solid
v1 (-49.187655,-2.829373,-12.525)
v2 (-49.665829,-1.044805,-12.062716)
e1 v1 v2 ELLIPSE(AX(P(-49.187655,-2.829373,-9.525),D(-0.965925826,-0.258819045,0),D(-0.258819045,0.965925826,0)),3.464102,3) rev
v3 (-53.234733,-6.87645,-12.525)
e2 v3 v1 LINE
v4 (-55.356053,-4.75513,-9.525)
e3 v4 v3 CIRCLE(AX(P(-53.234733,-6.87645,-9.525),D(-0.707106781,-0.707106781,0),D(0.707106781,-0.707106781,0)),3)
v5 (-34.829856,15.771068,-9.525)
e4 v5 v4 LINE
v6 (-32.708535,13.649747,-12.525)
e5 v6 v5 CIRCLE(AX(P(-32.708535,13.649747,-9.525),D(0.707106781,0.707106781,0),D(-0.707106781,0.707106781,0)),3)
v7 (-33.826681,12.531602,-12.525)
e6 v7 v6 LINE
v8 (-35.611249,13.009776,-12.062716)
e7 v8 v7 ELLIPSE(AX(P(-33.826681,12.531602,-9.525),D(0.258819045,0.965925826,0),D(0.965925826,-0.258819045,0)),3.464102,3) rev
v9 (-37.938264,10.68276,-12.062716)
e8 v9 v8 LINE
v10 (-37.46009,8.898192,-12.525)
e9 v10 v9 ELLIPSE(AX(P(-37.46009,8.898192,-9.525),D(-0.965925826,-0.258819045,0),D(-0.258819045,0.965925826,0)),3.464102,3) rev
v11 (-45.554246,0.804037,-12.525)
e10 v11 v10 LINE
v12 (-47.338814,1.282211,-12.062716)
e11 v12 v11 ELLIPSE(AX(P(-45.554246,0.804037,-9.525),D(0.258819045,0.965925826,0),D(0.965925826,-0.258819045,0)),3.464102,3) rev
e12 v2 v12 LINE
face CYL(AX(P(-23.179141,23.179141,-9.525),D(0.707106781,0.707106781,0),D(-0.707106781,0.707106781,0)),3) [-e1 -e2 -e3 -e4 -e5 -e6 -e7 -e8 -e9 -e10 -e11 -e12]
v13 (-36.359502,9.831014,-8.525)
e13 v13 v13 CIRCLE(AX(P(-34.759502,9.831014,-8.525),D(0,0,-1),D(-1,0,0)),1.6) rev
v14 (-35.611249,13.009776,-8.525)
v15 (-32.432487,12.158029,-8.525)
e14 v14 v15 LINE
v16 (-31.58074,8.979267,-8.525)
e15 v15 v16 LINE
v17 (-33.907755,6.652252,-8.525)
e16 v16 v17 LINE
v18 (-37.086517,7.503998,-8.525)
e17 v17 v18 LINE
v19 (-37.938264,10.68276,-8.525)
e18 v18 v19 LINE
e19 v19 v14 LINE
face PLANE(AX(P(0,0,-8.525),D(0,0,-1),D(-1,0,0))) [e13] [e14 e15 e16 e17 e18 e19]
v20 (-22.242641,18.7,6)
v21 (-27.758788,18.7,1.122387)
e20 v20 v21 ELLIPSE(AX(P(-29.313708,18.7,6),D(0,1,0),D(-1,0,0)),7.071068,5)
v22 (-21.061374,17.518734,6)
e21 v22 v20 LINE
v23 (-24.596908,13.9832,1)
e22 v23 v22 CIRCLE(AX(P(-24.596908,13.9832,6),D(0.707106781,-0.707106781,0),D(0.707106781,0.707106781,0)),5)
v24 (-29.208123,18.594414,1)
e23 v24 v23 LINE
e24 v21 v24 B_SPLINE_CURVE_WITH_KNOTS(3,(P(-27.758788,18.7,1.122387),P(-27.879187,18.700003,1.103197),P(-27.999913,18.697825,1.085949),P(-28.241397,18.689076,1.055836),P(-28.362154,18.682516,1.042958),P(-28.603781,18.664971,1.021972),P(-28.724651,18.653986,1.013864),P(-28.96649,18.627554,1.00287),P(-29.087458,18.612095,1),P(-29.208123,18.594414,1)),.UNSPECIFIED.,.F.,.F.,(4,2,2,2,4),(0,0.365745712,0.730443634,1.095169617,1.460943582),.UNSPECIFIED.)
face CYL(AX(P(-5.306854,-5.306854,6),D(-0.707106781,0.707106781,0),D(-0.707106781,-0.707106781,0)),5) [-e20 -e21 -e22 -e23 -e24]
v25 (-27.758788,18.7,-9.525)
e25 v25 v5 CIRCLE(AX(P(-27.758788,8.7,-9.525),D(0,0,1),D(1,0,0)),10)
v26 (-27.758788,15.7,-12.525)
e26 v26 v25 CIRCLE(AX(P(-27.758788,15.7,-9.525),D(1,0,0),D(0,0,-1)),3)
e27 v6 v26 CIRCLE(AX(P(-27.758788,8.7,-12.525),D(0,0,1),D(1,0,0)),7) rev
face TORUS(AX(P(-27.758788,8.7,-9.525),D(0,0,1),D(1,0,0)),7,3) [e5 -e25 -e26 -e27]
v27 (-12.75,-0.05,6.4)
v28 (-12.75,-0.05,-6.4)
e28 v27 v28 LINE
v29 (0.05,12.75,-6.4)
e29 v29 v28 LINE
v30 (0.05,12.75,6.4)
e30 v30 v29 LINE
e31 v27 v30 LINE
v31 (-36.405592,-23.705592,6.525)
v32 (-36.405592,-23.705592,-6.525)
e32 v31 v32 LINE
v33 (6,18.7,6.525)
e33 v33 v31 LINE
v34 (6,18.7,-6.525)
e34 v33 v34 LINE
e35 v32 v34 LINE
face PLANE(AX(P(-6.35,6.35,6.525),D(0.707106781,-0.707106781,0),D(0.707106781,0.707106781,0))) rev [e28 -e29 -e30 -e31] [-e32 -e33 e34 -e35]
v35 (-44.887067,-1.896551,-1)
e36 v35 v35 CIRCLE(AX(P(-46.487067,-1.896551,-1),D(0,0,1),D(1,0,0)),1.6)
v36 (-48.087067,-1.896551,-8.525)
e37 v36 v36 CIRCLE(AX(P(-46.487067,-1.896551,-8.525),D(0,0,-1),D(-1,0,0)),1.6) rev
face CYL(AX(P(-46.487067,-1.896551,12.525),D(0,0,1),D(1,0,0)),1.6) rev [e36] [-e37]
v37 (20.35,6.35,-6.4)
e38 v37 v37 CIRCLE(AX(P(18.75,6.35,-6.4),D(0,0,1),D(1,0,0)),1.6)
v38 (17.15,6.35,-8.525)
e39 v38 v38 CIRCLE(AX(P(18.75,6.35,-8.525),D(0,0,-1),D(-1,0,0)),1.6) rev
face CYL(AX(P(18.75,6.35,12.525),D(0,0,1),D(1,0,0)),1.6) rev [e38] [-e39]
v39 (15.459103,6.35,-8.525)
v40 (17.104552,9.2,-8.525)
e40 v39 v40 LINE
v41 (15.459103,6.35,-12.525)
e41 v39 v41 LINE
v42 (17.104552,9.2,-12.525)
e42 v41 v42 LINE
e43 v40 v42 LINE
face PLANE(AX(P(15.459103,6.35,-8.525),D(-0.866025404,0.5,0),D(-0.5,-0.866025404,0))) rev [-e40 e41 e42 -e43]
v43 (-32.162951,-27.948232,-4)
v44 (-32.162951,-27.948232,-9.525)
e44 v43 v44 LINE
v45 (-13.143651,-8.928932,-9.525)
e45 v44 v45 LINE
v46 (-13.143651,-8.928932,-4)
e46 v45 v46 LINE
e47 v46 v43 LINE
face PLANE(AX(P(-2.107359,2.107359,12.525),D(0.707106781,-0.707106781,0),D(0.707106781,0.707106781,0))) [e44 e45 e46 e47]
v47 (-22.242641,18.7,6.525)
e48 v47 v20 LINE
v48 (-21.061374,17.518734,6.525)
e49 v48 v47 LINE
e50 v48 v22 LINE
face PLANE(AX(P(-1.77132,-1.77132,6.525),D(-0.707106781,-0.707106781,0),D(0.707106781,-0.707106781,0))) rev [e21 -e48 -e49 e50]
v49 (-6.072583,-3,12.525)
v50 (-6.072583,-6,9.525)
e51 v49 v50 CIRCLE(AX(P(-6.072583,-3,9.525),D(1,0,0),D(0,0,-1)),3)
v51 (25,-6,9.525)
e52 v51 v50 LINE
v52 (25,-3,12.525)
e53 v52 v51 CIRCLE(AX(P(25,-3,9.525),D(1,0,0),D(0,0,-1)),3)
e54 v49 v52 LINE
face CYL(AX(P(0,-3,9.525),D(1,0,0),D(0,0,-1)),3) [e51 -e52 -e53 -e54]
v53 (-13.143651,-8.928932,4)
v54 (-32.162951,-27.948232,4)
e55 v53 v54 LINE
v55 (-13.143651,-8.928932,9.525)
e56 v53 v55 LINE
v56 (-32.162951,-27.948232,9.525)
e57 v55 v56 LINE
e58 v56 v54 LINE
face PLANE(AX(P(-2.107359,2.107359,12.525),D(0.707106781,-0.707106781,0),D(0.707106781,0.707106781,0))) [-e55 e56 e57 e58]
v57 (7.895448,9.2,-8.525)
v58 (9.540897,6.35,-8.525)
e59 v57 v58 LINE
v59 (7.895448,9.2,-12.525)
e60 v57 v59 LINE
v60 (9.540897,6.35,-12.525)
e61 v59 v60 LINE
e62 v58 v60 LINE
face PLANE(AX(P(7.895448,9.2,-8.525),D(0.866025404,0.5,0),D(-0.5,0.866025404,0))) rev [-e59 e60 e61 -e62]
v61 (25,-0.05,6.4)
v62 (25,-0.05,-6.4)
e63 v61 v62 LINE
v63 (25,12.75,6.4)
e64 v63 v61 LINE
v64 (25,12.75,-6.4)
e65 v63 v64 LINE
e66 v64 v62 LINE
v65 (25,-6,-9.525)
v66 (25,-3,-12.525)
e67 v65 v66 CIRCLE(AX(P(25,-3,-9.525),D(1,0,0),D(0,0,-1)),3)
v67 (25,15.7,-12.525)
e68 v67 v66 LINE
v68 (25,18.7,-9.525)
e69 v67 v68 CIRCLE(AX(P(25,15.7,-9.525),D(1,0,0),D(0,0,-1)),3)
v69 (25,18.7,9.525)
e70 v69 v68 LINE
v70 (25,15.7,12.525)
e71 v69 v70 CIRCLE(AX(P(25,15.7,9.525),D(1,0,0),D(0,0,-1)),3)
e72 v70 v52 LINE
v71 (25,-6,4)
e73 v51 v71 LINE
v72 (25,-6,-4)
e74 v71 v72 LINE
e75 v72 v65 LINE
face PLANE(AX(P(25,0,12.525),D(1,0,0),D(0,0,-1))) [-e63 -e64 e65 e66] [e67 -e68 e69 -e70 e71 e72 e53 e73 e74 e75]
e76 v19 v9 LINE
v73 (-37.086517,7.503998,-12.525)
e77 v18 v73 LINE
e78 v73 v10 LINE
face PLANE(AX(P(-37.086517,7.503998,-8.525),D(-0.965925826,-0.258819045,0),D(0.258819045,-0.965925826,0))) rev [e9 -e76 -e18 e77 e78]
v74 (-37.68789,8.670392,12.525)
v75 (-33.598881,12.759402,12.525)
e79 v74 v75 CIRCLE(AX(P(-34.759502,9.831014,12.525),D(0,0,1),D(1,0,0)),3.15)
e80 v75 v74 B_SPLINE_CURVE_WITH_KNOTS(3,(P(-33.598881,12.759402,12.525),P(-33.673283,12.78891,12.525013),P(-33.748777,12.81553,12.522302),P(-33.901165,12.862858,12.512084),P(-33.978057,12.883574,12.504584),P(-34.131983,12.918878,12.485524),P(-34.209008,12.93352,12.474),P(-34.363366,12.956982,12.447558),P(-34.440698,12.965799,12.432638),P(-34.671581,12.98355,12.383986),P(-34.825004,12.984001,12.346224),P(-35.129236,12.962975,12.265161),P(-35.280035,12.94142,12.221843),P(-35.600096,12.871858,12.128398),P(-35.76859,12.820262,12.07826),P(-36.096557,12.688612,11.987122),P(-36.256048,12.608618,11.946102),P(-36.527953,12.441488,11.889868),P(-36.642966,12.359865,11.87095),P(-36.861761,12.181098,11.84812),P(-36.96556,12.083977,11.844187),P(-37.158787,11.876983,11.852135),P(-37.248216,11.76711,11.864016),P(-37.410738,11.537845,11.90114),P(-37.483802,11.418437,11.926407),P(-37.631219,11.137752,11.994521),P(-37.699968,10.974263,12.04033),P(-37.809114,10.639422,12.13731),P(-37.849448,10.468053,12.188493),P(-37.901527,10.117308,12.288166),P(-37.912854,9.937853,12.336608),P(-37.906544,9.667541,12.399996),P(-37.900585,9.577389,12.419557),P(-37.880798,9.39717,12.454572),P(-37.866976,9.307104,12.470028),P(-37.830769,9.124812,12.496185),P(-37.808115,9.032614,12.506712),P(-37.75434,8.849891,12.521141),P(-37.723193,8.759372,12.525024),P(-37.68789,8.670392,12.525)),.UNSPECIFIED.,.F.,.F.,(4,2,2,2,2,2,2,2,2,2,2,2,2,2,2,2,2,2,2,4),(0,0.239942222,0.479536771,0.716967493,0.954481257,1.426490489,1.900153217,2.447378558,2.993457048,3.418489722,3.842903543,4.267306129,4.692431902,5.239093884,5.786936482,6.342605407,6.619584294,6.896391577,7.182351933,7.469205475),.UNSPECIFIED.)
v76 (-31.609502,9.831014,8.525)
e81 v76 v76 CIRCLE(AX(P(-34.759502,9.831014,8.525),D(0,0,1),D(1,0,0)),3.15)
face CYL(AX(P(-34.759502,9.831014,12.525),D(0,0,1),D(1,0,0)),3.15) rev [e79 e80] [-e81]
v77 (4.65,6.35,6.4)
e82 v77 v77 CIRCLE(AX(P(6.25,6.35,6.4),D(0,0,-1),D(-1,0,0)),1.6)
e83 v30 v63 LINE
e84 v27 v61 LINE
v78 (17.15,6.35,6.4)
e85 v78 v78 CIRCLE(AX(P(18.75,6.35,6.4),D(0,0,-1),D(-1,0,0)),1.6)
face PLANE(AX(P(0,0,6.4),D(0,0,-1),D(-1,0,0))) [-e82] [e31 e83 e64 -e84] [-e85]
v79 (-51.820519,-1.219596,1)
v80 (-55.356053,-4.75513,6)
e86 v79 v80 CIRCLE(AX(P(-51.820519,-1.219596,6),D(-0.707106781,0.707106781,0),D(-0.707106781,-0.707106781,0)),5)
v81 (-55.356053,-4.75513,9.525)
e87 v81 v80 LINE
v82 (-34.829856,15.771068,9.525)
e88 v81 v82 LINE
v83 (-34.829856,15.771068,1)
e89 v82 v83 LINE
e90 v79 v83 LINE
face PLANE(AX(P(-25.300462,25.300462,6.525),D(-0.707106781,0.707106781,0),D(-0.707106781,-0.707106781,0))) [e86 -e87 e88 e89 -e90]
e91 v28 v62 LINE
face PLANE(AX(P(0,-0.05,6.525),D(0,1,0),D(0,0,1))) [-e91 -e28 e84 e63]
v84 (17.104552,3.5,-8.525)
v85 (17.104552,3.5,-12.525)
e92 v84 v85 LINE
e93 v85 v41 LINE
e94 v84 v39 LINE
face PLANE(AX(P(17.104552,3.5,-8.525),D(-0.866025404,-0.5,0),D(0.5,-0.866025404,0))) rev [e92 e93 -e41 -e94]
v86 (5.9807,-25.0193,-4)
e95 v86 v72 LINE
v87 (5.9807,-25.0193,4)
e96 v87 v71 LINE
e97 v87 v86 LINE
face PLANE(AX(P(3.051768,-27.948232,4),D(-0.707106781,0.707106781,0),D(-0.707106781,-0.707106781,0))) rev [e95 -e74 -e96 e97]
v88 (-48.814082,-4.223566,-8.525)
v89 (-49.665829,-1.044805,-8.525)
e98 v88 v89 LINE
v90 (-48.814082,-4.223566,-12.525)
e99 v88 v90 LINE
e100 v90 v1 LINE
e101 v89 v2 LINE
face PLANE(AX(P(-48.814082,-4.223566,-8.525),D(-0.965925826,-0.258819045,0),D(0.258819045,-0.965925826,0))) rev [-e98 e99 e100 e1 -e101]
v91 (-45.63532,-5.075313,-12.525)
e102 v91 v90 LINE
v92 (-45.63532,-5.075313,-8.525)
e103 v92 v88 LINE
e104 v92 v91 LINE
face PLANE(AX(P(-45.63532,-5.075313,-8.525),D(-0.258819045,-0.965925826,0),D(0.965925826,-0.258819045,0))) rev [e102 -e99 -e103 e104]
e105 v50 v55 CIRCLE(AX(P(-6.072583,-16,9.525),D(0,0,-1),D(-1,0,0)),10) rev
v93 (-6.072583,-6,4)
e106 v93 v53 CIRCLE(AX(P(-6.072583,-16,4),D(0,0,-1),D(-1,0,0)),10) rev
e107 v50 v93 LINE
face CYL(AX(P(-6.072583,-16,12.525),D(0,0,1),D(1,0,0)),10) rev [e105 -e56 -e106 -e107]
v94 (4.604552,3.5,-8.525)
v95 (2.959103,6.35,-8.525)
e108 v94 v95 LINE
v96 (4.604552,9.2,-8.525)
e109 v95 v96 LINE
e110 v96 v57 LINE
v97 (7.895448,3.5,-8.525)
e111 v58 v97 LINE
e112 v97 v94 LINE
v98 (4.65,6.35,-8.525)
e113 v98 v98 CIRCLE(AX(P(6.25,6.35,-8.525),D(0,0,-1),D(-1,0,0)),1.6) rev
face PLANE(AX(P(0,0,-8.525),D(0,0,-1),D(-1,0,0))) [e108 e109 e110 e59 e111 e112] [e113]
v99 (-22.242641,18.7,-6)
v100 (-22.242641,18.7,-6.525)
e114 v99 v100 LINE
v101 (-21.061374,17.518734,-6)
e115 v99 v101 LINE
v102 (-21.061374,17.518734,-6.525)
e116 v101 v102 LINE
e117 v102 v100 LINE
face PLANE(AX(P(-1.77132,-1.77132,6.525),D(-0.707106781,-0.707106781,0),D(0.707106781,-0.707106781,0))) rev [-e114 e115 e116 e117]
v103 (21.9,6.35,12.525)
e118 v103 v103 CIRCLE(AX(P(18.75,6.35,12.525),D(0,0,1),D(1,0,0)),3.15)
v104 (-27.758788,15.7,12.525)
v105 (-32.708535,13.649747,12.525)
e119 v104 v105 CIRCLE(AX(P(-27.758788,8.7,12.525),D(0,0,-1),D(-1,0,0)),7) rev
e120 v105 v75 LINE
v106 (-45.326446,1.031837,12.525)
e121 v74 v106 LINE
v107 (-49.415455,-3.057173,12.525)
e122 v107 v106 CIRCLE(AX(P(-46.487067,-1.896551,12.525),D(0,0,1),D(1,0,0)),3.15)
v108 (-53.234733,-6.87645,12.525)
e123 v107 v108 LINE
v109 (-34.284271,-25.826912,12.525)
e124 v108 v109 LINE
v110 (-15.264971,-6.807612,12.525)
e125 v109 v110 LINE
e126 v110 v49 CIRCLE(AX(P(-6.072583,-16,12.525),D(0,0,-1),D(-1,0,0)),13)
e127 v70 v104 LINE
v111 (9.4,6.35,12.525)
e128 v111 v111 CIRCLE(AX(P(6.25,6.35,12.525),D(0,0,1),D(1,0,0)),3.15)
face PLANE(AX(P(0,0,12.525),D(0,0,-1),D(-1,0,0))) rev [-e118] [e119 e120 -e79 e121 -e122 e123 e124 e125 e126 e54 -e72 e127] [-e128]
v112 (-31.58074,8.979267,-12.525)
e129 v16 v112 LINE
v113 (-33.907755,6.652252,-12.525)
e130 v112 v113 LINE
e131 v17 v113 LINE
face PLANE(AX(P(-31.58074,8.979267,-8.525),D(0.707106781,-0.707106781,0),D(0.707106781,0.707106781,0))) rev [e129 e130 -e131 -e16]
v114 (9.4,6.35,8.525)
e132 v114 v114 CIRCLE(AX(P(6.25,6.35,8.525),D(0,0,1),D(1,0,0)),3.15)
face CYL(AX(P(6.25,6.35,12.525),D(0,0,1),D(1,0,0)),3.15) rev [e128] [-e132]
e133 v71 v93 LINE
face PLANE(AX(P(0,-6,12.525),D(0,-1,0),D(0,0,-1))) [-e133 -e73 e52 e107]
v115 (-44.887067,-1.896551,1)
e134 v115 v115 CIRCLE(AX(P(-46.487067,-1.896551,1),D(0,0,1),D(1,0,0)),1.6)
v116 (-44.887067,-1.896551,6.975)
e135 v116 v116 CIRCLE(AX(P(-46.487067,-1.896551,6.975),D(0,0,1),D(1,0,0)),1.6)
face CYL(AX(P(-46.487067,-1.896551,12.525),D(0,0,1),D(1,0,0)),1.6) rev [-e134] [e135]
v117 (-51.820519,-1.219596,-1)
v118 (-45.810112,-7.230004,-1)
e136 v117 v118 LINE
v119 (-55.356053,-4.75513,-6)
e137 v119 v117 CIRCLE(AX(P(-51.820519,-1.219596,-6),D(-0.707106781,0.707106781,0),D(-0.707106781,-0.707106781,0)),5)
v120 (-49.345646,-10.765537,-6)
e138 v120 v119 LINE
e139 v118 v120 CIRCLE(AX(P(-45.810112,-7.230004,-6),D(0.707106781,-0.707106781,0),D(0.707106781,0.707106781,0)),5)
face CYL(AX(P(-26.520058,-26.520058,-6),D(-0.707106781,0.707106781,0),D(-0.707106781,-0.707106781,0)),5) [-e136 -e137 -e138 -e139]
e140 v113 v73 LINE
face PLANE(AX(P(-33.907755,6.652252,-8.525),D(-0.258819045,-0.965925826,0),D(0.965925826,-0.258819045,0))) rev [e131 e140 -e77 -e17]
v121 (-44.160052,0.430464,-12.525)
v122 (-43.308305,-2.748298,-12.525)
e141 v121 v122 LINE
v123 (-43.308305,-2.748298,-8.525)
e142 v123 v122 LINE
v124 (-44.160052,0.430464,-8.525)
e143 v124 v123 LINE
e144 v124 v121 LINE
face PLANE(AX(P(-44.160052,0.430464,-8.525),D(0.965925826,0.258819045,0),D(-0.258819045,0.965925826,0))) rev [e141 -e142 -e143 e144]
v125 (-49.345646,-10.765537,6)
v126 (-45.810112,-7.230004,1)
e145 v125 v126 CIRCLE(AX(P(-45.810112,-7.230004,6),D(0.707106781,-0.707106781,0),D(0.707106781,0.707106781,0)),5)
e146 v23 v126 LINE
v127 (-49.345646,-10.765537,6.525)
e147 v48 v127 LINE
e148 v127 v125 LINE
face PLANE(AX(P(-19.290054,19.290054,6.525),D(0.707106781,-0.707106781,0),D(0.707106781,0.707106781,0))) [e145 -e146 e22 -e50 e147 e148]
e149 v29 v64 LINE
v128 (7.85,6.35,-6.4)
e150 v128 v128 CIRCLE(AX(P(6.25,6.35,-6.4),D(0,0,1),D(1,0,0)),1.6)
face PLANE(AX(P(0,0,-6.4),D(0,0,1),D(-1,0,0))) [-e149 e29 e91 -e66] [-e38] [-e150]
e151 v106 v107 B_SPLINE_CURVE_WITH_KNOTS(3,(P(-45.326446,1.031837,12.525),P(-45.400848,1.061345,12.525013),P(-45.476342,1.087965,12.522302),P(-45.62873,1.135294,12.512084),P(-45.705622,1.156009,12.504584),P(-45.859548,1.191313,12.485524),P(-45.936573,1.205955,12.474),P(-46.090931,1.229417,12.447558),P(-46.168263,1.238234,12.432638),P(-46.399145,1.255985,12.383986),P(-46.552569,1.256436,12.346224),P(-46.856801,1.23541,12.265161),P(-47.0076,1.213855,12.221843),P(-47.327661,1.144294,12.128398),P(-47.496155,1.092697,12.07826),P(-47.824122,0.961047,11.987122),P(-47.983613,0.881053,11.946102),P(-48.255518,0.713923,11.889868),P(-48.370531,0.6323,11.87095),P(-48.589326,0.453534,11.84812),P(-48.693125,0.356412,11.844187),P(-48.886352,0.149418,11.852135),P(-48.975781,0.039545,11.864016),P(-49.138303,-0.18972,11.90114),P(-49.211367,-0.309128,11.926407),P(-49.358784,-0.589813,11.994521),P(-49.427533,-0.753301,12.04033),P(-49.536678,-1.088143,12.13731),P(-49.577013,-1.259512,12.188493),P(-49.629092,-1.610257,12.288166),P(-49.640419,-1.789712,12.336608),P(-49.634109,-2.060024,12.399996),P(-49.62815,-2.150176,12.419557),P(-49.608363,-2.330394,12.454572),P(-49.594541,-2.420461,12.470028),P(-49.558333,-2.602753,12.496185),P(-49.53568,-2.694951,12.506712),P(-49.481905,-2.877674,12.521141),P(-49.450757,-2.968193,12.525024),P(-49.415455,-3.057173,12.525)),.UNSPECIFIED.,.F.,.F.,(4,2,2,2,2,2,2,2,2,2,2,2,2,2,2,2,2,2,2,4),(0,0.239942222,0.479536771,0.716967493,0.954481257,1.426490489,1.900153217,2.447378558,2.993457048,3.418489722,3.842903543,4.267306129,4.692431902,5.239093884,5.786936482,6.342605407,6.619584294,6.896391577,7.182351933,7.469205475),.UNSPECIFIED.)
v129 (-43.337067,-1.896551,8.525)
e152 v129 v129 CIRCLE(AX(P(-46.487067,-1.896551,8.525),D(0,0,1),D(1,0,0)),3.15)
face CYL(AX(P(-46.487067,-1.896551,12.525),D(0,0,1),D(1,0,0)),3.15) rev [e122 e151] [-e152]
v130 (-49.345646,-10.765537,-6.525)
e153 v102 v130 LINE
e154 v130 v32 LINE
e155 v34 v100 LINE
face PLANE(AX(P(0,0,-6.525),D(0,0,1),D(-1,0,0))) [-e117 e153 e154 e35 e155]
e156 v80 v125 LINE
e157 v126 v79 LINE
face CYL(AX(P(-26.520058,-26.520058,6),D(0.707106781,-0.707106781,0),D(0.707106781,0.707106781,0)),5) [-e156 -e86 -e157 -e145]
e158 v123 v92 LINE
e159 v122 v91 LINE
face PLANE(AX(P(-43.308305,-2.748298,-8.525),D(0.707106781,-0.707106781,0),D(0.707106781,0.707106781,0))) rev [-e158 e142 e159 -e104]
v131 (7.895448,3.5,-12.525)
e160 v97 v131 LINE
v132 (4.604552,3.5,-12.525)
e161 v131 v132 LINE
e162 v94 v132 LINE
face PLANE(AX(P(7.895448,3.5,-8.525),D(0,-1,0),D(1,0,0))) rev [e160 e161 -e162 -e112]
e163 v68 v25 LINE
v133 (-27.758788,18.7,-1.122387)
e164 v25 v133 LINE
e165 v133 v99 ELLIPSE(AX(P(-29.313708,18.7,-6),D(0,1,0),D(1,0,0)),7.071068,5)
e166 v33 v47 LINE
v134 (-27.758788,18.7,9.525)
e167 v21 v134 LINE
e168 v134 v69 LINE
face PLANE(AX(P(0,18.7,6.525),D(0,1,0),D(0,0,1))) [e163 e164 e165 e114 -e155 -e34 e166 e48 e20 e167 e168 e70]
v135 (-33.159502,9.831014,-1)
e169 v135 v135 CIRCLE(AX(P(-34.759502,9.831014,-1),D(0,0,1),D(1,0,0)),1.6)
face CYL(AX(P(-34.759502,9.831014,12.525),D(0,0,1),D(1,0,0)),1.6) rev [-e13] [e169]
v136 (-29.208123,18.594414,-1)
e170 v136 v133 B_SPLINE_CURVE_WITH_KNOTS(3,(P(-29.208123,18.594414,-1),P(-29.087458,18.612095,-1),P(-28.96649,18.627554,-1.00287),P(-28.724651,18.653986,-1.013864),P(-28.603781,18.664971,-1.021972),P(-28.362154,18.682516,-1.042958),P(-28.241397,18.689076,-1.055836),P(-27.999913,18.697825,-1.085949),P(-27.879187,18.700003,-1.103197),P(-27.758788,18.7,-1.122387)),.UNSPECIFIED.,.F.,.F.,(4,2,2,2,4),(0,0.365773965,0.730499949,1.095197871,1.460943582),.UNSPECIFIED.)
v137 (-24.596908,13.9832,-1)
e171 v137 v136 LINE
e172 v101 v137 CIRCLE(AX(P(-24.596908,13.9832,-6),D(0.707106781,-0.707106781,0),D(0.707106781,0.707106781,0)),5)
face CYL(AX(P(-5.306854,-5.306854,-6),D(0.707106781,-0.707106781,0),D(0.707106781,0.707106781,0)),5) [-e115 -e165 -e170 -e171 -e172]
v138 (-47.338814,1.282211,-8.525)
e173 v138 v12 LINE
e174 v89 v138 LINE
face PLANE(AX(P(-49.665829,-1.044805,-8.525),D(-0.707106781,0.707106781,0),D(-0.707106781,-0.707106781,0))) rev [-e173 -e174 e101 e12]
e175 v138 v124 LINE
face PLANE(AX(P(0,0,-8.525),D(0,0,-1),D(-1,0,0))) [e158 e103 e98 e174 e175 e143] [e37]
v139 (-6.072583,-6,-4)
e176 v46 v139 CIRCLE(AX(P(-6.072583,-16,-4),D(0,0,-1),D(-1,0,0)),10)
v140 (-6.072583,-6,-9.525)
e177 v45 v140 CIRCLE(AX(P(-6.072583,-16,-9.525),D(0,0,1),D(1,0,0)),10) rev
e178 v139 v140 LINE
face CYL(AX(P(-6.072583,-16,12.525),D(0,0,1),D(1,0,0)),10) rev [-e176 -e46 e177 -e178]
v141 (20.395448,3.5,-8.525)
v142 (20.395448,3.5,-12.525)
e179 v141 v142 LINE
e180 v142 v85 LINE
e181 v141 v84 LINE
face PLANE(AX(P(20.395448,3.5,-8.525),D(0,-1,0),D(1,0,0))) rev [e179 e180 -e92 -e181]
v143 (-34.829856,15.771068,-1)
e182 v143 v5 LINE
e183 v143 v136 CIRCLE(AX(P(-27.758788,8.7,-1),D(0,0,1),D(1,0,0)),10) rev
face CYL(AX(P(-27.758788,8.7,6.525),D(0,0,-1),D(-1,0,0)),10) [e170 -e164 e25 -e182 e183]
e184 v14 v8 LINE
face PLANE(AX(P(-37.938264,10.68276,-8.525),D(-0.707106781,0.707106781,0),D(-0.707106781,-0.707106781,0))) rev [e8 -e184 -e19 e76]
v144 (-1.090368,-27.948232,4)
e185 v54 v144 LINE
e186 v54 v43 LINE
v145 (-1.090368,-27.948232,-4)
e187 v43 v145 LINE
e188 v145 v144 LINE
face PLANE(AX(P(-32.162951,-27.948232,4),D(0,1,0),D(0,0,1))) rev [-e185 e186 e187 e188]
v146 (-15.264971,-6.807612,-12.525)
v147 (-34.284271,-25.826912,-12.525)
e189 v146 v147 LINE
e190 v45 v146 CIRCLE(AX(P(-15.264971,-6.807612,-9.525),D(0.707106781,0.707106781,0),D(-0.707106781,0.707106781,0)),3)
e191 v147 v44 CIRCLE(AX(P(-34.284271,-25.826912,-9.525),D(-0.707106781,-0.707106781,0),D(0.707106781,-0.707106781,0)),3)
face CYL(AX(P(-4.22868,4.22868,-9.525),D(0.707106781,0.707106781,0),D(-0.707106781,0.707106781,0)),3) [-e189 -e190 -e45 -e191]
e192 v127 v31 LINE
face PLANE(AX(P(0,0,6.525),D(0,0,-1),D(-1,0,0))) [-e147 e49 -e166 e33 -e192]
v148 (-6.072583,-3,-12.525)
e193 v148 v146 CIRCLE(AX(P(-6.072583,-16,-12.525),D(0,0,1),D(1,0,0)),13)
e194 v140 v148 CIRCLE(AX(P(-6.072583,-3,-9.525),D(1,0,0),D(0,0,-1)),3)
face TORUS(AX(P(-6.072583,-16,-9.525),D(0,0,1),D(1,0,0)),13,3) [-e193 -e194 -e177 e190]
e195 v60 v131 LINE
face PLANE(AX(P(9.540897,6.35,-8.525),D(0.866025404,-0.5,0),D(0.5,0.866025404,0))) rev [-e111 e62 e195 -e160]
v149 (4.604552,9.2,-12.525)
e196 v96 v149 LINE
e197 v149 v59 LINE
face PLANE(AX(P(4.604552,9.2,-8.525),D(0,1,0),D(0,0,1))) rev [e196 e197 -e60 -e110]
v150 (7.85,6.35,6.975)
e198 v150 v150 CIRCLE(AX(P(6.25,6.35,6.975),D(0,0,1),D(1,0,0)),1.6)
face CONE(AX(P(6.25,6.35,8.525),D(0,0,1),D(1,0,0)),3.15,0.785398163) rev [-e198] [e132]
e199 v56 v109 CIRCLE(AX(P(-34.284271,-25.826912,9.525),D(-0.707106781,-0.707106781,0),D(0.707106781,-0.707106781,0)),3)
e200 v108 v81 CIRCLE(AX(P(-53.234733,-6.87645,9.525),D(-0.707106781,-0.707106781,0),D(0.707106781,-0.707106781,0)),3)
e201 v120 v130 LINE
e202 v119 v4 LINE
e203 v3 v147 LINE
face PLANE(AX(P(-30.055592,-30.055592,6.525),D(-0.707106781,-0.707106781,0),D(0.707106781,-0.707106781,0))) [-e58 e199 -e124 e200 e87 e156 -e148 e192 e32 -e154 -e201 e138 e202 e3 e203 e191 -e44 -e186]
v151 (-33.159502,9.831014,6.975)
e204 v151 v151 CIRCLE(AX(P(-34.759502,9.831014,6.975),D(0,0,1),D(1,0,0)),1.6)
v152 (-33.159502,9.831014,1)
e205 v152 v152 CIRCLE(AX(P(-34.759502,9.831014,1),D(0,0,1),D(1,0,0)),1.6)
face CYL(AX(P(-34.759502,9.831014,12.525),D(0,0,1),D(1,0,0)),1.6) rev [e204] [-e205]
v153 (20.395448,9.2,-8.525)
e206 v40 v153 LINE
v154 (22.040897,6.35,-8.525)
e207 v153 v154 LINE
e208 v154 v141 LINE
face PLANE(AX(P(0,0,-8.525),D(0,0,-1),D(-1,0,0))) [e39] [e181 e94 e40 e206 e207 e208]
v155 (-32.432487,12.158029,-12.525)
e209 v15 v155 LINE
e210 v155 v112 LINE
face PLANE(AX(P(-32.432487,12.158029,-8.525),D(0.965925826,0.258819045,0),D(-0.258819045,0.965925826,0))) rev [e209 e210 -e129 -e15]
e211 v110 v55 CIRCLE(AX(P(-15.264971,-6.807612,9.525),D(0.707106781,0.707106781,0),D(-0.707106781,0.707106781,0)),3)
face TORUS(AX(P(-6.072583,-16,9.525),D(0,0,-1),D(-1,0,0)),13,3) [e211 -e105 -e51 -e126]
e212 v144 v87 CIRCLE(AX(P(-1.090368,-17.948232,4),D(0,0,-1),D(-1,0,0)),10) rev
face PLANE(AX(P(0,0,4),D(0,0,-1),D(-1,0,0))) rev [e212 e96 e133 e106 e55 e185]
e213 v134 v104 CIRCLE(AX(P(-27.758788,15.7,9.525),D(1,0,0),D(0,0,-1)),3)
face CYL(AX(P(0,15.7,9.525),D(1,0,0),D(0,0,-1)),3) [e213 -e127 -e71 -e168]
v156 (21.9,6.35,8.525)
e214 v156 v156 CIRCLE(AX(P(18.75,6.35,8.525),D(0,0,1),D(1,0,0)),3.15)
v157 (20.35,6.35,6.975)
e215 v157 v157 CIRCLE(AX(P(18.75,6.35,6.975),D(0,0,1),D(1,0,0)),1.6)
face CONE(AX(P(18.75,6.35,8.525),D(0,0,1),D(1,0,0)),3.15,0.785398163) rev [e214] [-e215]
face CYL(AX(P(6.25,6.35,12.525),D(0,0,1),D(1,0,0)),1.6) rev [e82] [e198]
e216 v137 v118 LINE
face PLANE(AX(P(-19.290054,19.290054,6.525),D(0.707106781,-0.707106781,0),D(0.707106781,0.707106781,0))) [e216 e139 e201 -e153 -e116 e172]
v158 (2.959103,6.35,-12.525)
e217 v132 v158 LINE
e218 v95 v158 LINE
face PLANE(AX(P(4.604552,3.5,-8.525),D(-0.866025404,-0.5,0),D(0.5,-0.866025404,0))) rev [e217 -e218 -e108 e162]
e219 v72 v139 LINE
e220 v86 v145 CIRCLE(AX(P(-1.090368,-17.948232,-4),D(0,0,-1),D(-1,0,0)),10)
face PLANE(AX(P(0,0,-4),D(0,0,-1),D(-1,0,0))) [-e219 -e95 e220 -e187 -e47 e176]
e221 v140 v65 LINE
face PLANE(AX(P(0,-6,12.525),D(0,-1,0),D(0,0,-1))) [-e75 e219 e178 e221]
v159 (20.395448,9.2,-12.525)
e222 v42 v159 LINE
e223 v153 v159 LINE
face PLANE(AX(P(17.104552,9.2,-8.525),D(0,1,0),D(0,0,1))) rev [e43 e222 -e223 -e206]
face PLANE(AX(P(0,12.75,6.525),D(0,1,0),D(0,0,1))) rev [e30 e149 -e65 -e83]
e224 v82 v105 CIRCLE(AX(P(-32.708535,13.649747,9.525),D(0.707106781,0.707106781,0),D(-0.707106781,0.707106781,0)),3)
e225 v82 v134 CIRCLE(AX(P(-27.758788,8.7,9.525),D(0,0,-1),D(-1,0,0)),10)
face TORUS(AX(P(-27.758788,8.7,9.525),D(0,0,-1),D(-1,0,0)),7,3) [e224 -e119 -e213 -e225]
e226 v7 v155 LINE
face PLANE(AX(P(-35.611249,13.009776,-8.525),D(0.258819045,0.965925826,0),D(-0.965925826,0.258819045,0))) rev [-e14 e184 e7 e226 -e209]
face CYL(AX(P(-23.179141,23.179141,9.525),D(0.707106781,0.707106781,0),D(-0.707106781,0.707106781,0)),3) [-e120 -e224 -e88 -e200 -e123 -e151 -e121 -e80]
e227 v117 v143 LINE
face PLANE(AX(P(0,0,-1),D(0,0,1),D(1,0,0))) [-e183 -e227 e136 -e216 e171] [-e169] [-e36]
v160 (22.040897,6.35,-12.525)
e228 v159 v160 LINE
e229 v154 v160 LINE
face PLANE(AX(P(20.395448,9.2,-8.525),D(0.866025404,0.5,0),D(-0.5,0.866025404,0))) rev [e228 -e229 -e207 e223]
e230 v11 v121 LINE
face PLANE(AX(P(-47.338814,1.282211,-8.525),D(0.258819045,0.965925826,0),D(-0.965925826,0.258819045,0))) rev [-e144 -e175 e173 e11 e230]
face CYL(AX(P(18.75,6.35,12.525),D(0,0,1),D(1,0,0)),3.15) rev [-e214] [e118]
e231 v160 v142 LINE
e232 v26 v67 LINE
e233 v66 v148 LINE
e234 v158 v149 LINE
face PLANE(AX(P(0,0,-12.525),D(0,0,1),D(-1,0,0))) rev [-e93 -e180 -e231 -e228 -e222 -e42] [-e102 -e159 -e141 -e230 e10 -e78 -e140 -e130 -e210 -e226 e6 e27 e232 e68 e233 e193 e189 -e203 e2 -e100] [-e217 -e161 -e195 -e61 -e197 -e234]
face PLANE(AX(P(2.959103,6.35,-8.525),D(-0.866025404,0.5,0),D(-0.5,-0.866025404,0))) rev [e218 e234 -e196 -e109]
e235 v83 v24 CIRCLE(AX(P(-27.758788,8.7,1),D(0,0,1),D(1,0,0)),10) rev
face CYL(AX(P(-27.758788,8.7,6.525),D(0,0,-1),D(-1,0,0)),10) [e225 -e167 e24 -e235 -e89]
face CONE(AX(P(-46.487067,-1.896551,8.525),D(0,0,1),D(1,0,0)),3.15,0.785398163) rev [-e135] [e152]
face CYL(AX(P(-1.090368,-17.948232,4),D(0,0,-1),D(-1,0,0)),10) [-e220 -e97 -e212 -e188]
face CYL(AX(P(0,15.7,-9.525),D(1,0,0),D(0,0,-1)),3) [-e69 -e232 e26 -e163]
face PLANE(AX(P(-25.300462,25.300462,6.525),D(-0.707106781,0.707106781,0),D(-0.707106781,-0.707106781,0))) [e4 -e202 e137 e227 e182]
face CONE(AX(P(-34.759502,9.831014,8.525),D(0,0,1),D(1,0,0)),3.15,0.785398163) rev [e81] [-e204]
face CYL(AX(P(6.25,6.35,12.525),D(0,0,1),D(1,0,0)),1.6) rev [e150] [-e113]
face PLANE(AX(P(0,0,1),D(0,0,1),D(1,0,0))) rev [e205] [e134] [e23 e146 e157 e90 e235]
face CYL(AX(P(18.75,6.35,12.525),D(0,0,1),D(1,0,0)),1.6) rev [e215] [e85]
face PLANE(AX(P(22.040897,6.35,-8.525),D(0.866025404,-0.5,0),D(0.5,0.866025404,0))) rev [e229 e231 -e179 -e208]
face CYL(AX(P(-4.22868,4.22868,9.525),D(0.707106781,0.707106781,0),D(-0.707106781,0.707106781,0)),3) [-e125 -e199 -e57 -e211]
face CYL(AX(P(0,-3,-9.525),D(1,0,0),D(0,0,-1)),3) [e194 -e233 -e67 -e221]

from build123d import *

# Parameters (mm, degrees)
BOSS_EXTRUDE1_DEPTH                            = 6.525
BOSS_EXTRUDE1_2_DEPTH                          = 6.525
BOSS_EXTRUDE1_3_DEPTH                          = 6.525
BOSS_EXTRUDE2_START                            = 6.525
BOSS_EXTRUDE2_DEPTH                            = 6
BOSS_EXTRUDE3_DEPTH                            = 4
FILLET1_R                                      = 10
FILLET2_R                                      = 3
CUT_EXTRUDE1_DEPTH                             = 1
CSK_FOR_M3_FLAT_HEAD_MACHINE_SCREW1_AT_2_COUNT = 2
CSK_FOR_M3_FLAT_HEAD_MACHINE_SCREW1_AT_2_PITCH = 16.585281374
CSK_FOR_M3_FLAT_HEAD_MACHINE_SCREW1_AT_3_COUNT = 2
CSK_FOR_M3_FLAT_HEAD_MACHINE_SCREW1_AT_3_PITCH = 41.156976568
CSK_FOR_M3_FLAT_HEAD_MACHINE_SCREW1_AT_4_COUNT = 2
CSK_FOR_M3_FLAT_HEAD_MACHINE_SCREW1_AT_4_PITCH = 53.622609719
CUT_EXTRUDE2_DEPTH                             = 4
FILLET3_R                                      = 5
MOVE_START                                     = -6.525
MOVE_FACE2_OUTLINE_R                           = 1.6
MOVE_FACE2_DEPTH                               = 0.125
MOVE_START_2                                   = 6.4
MOVE_FACE2_2_OUTLINE_R                         = 1.6
MOVE_FACE2_2_DEPTH                             = 0.125
MOVE_START_3                                   = -0.05
MOVE_FACE3_OUTLINE_W                           = 37.75
MOVE_FACE3_OUTLINE_H                           = 12.8
MOVE_FACE3_DEPTH                               = 12.8


with BuildPart() as part:
    # Sketch1 → Boss-Extrude1 (new body)
    with BuildSketch(Plane.XY):
        Polygon((25, 0), (-12.7, 0), (-36.405591591, -23.705591591), (-32.162950904, -27.948232278), (-10.214718626, -6), (25, -6), align=None)
    boss_extrude1 = extrude(amount=BOSS_EXTRUDE1_DEPTH)



with BuildPart() as body_2:
    # Sketch1 → Boss-Extrude1 2 (new body)
    with BuildSketch(Plane.XY):
        Polygon((-49.345645687, -10.765537495), (-21.061374439, 17.518733752), (-22.242640687, 18.7), (-31.900923472, 18.7), (-55.356053327, -4.755129855), align=None)
    boss_extrude1_2 = extrude(amount=BOSS_EXTRUDE1_2_DEPTH)


with BuildPart() as body_3:
    # Sketch1 → Boss-Extrude1 3 (new body)
    with BuildSketch(Plane.XY):
        Polygon((6, 18.7), (0, 12.7), (25, 12.7), (25, 18.7), align=None)
    boss_extrude1_3 = extrude(amount=BOSS_EXTRUDE1_3_DEPTH)


with BuildPart() as part_1:
    add(part.part)

    add(body_2.part)  # Boss-Extrude2 merges body 2

    add(body_3.part)  # Boss-Extrude2 merges body 3
    # Sketch1<3> → Boss-Extrude2 (add)
    with BuildSketch(Plane.XY.offset(BOSS_EXTRUDE2_START)):
        Polygon((-32.162950904, -27.948232278), (-10.214718626, -6), (25, -6), (25, 18.7), (-31.900923472, 18.7), (-55.356053327, -4.755129855), align=None)
    boss_extrude2 = extrude(amount=BOSS_EXTRUDE2_DEPTH)

    # Mirror2: Boss-Extrude1, Boss-Extrude1 2, Boss-Extrude1 3, Boss-Extrude2 across plane
    add(boss_extrude1.mirror(Plane.XY))
    add(boss_extrude1_2.mirror(Plane.XY))
    add(boss_extrude1_3.mirror(Plane.XY))
    add(boss_extrude2.mirror(Plane.XY))

    # Sketch2 → Boss-Extrude3 (add, symmetric)
    with BuildSketch(Plane.XY):
        Polygon((-32.162950904, -27.948232278), (3.051767722, -27.948232278), (25, -6), (-10.214718626, -6), align=None)
    extrude(amount=BOSS_EXTRUDE3_DEPTH, both=True)

    # Fillet1
    fillet1_edges = [part_1.edges().sort_by_distance(p)[0] for p in [
        (-31.900923472, 18.7, 0),
        (-10.214718626, -6, 8.2625),
        (-10.214718626, -6, -8.2625),
        (3.051767722, -27.948232278, 0),
    ]]
    fillet(fillet1_edges, radius=FILLET1_R)

    # Fillet2
    fillet2_edges = [part_1.edges().sort_by_distance(p)[0] for p in [
        (-22.653300859, -18.438582233, -12.525),
        (-22.653300859, -18.438582233, 12.525),
        (-45.092954493, 5.507968978, -12.525),
        (-45.092954493, 5.507968978, 12.525),
        (-31.585622172, 17.938795325, -12.525),
        (-31.585622172, 17.938795325, 12.525),
        (-9.899417326, -6.761204675, -12.525),
        (-9.899417326, -6.761204675, 12.525),
        (9.463708499, -6, 12.525),
        (-1.379393924, 18.7, 12.525),
        (-1.379393924, 18.7, -12.525),
        (9.463708499, -6, -12.525),
    ]]
    fillet(fillet2_edges, radius=FILLET2_R)

    # Sketch1<4> → Cut-Extrude1 (cut, symmetric)
    with BuildSketch(Plane.XY):
        Polygon((-49.345645687, -10.765537495), (-21.061374439, 17.518733752), (-22.242640687, 18.7), (-31.900923472, 18.7), (-55.356053327, -4.755129855), align=None)
    extrude(amount=CUT_EXTRUDE1_DEPTH, both=True, mode=Mode.SUBTRACT)

    # Sketch6 → CSK for M3 Flat Head Machine Screw1 (revolve, cut)
    with BuildSketch(Plane(origin=(-34.759502115, 9.831013716, 12.525), x_dir=(0, -1, 0), z_dir=(1, 0, 0))):
        Polygon((0, 0), (0, 25.05), (1.6, 25.05), (1.6, 5.55), (3.15, 4), (3.15, 0), align=None)
    csk_for_m3_flat_head_machine_screw1 = revolve(axis=Axis((-34.759502115, 9.831013716, 18.875), (0, 0, -1)), mode=Mode.SUBTRACT)

    # CSK for M3 Flat Head Machine Screw1 at 2: CSK for M3 Flat Head Machine Screw1 ×2
    with Locations(*[Vector(-0.7071067811865509, -0.7071067811865441, 0) * (i * CSK_FOR_M3_FLAT_HEAD_MACHINE_SCREW1_AT_2_PITCH) for i in range(1, CSK_FOR_M3_FLAT_HEAD_MACHINE_SCREW1_AT_2_COUNT)]):
        add(csk_for_m3_flat_head_machine_screw1, mode=Mode.SUBTRACT)

    # CSK for M3 Flat Head Machine Screw1 at 3: CSK for M3 Flat Head Machine Screw1 ×2
    with Locations(*[Vector(0.9964167811823362, -0.08457894642422821, 0) * (i * CSK_FOR_M3_FLAT_HEAD_MACHINE_SCREW1_AT_3_PITCH) for i in range(1, CSK_FOR_M3_FLAT_HEAD_MACHINE_SCREW1_AT_3_COUNT)]):
        add(csk_for_m3_flat_head_machine_screw1, mode=Mode.SUBTRACT)

    # CSK for M3 Flat Head Machine Screw1 at 4: CSK for M3 Flat Head Machine Screw1 ×2
    with Locations(*[Vector(0.9978906732683498, -0.06491690229855007, 0) * (i * CSK_FOR_M3_FLAT_HEAD_MACHINE_SCREW1_AT_4_PITCH) for i in range(1, CSK_FOR_M3_FLAT_HEAD_MACHINE_SCREW1_AT_4_COUNT)]):
        add(csk_for_m3_flat_head_machine_screw1, mode=Mode.SUBTRACT)

    # Sketch7 → Cut-Extrude2 (cut)
    with BuildSketch(Plane(origin=(0, 0, -12.525), x_dir=(-1, 0, 0), z_dir=(0, 0, -1))):
        Polygon((37.93826407, 10.682760415), (35.611248814, 13.00977567), (32.43248686, 12.158028972), (31.580740161, 8.979267018), (33.907755417, 6.652251762), (37.086517371, 7.503998461), align=None)
        Polygon((49.665828997, -1.044804513), (47.338813742, 1.282210743), (44.160051787, 0.430464044), (43.308305089, -2.74829791), (45.635320344, -5.075313166), (48.814082299, -4.223566467), align=None)
        Polygon((-15.459103466, 6.35), (-17.104551733, 9.2), (-20.395448267, 9.2), (-22.040896534, 6.35), (-20.395448267, 3.5), (-17.104551733, 3.5), align=None)
        Polygon((-2.959103466, 6.35), (-4.604551733, 9.2), (-7.895448267, 9.2), (-9.540896534, 6.35), (-7.895448267, 3.5), (-4.604551733, 3.5), align=None)
    extrude(amount=-CUT_EXTRUDE2_DEPTH, mode=Mode.SUBTRACT)

    # Fillet3
    fillet3_edges = [part_1.edges().sort_by_distance(p)[0] for p in [
        (-21.652007563, 18.109366876, -1),
        (-52.350849507, -7.760333675, 1),
        (-52.350849507, -7.760333675, -1),
        (-21.652007563, 18.109366876, 1),
    ]]
    fillet(fillet3_edges, radius=FILLET3_R)

    # Move Face2: read off the stored shape, not the designer's step
    # Move Face2 outline → Move Face2 (add)
    with BuildSketch(Plane.XY.offset(MOVE_START)):
        Polygon((-12.7, 0), (25, 0), (25, 12.7), (0, 12.7), align=None)
        with Locations((6.25, 6.35)):
            Circle(MOVE_FACE2_OUTLINE_R, mode=Mode.SUBTRACT)
        with Locations((18.75, 6.35)):
            Circle(MOVE_FACE2_OUTLINE_R, mode=Mode.SUBTRACT)
    extrude(amount=MOVE_FACE2_DEPTH)

    # Move Face2 2 outline → Move Face2 2 (add)
    with BuildSketch(Plane.XY.offset(MOVE_START_2)):
        Polygon((-12.7, 0), (25, 0), (25, 12.7), (0, 12.7), align=None)
        with Locations((6.25, 6.35)):
            Circle(MOVE_FACE2_2_OUTLINE_R, mode=Mode.SUBTRACT)
        with Locations((18.75, 6.35)):
            Circle(MOVE_FACE2_2_OUTLINE_R, mode=Mode.SUBTRACT)
    extrude(amount=MOVE_FACE2_2_DEPTH)

    # Move Face3: read off the stored shape, not the designer's step
    # Move Face3 outline → Move Face3 (cut)
    with BuildSketch(Plane(origin=(0, 0, 0), x_dir=(1, 0, 0), z_dir=(0, 1, 0)).offset(MOVE_START_3)):
        with Locations((6.125, 0)):
            Rectangle(MOVE_FACE3_OUTLINE_W, MOVE_FACE3_OUTLINE_H)
    extrude(amount=MOVE_FACE3_DEPTH, mode=Mode.SUBTRACT)


solid = part_1.part
